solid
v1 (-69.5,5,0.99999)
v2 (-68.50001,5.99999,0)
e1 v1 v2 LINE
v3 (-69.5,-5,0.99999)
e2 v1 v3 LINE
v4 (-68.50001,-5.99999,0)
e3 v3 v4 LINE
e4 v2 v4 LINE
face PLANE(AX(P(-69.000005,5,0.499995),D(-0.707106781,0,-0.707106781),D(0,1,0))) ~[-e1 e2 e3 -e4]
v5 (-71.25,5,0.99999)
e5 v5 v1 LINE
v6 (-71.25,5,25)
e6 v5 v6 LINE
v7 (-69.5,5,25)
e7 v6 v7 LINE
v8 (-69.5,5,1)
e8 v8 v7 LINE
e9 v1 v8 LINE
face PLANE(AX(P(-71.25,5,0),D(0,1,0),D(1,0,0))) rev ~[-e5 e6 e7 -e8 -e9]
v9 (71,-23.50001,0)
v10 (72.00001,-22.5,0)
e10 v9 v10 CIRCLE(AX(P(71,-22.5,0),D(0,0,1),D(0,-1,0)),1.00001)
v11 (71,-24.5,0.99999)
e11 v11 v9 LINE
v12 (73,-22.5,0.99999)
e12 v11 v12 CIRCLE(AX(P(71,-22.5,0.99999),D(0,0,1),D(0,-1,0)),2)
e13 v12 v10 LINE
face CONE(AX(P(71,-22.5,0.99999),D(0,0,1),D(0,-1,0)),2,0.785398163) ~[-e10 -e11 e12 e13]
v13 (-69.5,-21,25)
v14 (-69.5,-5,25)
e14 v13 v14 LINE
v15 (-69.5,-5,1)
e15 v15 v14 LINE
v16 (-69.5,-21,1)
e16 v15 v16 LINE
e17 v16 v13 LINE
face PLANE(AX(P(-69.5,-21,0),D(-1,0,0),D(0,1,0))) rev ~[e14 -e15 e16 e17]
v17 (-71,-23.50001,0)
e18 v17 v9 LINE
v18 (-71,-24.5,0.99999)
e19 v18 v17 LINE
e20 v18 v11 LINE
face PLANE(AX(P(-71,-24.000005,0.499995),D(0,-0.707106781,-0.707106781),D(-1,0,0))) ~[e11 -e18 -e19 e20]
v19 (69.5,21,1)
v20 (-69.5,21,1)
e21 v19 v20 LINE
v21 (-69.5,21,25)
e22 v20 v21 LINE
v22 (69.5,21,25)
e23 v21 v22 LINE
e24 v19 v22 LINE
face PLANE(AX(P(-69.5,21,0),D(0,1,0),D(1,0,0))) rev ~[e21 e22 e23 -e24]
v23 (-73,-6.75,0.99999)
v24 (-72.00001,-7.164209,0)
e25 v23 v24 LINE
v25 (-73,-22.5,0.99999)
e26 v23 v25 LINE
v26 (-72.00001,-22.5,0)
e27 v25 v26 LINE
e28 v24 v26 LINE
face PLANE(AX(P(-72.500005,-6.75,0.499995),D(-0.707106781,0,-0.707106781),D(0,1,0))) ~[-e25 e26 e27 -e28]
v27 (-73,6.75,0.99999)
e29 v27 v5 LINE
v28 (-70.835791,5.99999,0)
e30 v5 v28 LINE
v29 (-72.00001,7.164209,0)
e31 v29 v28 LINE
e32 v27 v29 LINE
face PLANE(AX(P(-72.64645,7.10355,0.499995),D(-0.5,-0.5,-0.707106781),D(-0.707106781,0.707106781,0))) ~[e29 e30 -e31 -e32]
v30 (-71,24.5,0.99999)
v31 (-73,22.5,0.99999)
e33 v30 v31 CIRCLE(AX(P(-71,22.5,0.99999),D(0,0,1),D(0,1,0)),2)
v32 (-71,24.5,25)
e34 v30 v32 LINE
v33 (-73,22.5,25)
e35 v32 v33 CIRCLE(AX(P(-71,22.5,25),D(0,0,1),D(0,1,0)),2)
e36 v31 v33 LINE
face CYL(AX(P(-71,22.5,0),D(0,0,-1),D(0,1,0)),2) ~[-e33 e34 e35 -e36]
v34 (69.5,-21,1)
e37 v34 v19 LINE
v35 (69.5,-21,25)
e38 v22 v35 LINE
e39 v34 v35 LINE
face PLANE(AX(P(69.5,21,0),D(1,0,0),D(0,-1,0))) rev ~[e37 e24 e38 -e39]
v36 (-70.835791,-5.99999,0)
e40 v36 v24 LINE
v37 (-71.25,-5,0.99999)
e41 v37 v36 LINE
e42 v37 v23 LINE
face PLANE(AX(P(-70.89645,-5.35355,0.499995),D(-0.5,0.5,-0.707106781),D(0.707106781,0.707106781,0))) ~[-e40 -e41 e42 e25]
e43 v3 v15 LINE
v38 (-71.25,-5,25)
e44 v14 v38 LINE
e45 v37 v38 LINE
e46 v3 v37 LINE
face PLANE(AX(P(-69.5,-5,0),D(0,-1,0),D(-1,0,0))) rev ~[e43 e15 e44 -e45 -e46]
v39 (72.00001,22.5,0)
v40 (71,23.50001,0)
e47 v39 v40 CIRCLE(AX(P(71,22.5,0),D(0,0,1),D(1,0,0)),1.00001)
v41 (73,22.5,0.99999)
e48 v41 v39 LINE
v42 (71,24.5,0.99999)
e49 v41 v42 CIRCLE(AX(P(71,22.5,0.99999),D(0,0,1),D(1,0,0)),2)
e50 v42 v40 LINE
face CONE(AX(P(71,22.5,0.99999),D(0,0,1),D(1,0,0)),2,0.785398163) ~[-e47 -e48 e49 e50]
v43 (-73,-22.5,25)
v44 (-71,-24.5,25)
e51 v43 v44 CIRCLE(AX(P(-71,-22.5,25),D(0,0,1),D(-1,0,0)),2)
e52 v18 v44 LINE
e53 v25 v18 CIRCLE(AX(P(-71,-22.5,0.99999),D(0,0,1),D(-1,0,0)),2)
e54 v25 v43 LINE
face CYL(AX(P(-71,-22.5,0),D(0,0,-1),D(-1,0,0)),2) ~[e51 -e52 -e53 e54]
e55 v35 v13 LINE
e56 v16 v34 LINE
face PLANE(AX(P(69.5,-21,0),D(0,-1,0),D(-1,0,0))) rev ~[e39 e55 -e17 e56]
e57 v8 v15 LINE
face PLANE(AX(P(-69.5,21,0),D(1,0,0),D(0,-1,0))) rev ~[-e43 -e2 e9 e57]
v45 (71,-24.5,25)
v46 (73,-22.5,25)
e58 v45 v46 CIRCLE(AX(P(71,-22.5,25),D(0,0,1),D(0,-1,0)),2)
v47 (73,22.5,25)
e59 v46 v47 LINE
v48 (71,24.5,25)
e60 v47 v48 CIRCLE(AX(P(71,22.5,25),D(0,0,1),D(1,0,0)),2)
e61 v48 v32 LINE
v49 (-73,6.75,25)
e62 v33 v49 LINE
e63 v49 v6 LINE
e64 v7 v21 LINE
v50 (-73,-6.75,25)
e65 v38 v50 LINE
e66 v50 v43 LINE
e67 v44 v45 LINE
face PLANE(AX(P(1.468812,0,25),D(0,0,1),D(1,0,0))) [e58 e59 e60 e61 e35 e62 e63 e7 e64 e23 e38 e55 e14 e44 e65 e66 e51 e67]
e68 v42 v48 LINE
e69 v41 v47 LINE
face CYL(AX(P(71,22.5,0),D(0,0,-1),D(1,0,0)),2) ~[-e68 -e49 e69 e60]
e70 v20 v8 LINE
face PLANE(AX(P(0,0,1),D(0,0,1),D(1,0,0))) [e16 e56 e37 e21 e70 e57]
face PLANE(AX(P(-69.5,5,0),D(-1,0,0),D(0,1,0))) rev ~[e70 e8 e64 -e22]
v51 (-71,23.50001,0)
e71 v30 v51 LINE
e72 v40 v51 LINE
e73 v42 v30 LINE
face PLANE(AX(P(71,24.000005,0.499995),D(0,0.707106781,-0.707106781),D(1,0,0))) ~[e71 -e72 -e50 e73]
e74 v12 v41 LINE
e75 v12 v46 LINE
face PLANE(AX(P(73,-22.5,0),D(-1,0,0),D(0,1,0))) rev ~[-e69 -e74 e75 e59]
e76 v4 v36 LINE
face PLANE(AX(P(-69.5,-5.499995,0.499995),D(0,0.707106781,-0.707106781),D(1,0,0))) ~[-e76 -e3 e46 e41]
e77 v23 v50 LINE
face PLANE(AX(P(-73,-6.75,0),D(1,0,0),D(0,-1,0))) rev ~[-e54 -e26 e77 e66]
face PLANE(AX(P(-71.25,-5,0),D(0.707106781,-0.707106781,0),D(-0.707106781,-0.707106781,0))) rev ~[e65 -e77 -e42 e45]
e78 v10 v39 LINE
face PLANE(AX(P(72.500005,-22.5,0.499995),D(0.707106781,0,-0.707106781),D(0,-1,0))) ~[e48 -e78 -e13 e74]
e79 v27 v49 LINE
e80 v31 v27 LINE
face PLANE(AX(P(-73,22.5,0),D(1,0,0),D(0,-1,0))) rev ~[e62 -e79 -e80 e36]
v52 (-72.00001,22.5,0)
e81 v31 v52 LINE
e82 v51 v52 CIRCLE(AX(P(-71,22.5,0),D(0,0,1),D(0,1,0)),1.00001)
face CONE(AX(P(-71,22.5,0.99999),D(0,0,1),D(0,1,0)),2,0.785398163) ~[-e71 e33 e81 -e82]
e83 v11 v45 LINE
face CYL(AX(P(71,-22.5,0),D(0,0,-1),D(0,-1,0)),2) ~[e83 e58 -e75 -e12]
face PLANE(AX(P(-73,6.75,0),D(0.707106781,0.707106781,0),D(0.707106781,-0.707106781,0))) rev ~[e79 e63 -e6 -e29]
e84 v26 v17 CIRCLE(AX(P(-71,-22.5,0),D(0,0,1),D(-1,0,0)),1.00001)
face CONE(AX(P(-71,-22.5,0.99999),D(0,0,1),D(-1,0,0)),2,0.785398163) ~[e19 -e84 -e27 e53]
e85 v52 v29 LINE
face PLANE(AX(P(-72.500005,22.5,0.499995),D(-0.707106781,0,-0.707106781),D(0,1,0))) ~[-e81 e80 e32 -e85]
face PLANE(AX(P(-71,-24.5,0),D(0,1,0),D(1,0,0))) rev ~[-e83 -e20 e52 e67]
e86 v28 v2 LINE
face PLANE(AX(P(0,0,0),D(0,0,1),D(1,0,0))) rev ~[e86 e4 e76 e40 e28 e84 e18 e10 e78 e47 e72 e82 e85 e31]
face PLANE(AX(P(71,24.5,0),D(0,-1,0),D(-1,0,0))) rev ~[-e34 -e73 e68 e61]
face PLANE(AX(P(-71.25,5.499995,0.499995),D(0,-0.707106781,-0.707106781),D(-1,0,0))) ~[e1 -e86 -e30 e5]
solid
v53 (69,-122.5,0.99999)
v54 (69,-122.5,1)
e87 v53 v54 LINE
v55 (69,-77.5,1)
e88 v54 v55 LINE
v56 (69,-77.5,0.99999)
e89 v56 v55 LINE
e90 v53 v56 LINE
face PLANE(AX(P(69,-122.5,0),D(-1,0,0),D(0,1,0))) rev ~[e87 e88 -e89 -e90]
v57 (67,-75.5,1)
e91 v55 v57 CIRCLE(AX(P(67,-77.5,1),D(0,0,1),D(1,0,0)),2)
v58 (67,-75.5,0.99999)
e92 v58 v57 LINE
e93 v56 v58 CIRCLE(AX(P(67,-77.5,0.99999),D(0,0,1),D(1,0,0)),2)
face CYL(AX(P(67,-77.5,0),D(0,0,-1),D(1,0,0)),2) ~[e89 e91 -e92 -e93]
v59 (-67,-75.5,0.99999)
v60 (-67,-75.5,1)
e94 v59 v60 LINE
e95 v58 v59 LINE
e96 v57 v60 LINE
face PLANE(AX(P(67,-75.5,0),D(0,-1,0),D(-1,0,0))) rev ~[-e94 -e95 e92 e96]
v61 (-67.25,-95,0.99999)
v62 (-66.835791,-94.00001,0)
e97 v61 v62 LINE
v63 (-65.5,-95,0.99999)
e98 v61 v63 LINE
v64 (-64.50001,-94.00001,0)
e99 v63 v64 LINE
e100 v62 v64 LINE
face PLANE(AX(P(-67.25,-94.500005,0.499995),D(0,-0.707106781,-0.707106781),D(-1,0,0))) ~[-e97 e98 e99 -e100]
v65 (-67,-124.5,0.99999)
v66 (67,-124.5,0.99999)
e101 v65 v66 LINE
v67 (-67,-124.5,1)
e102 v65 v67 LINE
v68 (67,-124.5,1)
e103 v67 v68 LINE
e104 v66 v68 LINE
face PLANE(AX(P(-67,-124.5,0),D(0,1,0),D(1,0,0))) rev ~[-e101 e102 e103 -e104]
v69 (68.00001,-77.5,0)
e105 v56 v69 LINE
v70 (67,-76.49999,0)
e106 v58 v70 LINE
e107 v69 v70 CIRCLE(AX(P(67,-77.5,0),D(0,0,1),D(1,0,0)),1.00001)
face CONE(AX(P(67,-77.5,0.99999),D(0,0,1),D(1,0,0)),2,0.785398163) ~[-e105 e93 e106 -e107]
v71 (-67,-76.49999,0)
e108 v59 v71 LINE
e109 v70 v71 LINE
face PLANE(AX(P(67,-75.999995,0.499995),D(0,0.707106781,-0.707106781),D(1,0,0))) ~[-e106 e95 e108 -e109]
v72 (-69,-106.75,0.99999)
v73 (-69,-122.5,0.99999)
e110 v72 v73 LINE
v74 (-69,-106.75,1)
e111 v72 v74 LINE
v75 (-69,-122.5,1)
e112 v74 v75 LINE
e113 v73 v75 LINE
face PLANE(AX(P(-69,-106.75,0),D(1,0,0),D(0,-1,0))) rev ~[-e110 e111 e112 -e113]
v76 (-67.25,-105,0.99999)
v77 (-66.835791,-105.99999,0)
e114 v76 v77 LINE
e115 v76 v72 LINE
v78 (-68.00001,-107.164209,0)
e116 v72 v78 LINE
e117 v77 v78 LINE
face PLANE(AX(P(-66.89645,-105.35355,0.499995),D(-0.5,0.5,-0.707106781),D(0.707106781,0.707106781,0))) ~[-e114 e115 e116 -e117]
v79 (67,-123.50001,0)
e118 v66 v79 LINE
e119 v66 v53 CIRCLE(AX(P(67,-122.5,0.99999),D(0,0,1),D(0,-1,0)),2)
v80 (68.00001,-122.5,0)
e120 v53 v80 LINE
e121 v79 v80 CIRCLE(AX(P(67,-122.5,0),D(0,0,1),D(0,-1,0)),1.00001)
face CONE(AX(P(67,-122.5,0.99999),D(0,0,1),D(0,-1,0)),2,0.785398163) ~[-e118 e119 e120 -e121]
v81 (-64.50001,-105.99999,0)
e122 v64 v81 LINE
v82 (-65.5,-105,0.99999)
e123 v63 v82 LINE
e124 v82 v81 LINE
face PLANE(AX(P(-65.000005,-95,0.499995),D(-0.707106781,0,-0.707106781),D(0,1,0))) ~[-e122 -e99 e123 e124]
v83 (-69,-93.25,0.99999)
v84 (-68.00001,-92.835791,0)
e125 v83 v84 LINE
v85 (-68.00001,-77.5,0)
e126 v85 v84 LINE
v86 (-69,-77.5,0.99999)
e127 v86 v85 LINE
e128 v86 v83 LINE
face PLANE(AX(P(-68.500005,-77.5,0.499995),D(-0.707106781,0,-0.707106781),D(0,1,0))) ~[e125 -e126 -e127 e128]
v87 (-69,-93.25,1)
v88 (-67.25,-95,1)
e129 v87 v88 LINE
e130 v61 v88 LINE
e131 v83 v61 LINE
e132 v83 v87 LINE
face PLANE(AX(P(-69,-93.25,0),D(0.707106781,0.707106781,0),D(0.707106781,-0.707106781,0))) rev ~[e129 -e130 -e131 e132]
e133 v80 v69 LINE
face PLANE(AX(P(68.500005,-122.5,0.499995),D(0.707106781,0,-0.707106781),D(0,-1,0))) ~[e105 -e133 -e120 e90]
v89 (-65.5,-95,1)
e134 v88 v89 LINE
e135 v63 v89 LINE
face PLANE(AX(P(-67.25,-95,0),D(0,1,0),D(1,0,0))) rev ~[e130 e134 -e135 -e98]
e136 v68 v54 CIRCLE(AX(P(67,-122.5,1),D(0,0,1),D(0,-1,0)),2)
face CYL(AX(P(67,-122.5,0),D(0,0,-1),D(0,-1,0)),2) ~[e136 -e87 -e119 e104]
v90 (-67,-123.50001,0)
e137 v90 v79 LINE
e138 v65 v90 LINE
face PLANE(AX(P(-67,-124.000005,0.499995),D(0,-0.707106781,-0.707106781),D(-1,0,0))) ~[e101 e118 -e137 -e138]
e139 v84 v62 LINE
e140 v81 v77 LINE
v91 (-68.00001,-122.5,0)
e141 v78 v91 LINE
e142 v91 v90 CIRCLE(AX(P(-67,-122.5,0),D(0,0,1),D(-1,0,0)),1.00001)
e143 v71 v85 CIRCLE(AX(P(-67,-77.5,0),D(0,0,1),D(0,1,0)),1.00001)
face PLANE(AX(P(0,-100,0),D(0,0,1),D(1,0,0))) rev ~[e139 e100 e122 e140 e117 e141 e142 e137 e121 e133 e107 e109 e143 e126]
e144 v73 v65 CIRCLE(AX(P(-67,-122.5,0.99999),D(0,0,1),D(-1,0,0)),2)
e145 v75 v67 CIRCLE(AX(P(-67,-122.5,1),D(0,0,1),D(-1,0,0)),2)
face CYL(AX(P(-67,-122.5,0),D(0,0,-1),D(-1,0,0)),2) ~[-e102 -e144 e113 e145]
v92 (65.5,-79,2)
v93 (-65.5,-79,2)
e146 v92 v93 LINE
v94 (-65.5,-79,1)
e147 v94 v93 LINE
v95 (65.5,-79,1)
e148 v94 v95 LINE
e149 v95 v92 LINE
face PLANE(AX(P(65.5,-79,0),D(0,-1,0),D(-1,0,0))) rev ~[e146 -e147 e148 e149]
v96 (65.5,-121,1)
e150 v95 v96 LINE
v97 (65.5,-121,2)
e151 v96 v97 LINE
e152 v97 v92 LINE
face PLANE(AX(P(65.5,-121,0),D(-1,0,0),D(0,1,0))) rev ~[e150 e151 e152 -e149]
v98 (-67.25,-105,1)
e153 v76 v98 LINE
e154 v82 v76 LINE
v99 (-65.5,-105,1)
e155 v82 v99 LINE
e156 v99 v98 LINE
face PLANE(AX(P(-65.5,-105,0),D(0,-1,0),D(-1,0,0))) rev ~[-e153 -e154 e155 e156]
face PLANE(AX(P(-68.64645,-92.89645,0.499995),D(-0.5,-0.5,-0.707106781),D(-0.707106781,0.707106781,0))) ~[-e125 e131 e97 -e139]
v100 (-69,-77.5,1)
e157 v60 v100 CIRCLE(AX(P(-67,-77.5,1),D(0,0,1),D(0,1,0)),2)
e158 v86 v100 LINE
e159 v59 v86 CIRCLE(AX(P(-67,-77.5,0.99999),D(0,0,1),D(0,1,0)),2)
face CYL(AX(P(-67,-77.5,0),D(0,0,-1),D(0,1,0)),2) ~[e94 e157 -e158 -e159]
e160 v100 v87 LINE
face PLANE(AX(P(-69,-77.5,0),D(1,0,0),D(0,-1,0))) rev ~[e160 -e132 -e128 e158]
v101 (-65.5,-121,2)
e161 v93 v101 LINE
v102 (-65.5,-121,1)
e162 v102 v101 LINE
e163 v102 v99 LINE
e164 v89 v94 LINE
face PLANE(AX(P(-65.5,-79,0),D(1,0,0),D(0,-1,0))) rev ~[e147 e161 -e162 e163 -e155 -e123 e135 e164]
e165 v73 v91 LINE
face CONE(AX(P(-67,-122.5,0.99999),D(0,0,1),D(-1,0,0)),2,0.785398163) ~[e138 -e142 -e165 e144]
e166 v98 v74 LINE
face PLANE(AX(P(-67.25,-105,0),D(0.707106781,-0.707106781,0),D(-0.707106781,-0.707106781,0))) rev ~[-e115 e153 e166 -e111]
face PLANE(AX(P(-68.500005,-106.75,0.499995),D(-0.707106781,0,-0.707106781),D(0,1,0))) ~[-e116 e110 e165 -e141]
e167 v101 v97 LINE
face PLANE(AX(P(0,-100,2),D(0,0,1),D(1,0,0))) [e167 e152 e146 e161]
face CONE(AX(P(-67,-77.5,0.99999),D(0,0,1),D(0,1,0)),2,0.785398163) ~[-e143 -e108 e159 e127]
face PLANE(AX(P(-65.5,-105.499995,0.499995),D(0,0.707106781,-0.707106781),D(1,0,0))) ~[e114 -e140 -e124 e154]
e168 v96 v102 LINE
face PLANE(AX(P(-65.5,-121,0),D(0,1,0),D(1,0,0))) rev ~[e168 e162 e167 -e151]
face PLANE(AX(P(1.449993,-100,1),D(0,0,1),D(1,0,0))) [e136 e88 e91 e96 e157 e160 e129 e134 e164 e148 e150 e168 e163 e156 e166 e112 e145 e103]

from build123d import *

# Parameters (mm, degrees)
F1_DEPTH  = 1
F2_DEPTH  = 25
F3_DEPTH  = 1
F4_DEPTH  = 2
F5_SIZE   = 0.99999
F5_2_SIZE = 0.99999


# Not quite as in the source:
# - a fillet or chamfer is up to 0.001 mm smaller than in the source, because OpenCascade refuses the exact size


with BuildPart() as f1:
    # F0 (on Top) → F1 (new body)
    with BuildSketch(Plane.XY):
        Polygon((-69.5, -5), (-69.5, -21), (69.5, -21), (69.5, 21), (-69.5, 21), (-69.5, 5), align=None)
    extrude(amount=F1_DEPTH)

    # F0 (on Top) → F2 (join)
    with BuildSketch(Plane.XY):
        with BuildLine():
            Line((69.5, -21), (-69.5, -21))
            Line((-69.5, -21), (-69.5, -5))
            Line((-69.5, -5), (-71.25, -5))
            Line((-71.25, -5), (-73, -6.75))
            Line((-73, -6.75), (-73, -22.5))
            ThreePointArc((-73, -22.5), (-72.4142135624, -23.9142135624), (-71, -24.5))
            Line((-71, -24.5), (71, -24.5))
            ThreePointArc((71, -24.5), (72.4142135624, -23.9142135624), (73, -22.5))
            Line((73, -22.5), (73, 22.5))
            ThreePointArc((73, 22.5), (72.4142135624, 23.9142135624), (71, 24.5))
            Line((71, 24.5), (-71, 24.5))
            ThreePointArc((-71, 24.5), (-72.4142135624, 23.9142135624), (-73, 22.5))
            Line((-73, 22.5), (-73, 6.75))
            Line((-73, 6.75), (-71.25, 5))
            Line((-71.25, 5), (-69.5, 5))
            Line((-69.5, 5), (-69.5, 21))
            Line((-69.5, 21), (69.5, 21))
            Line((69.5, 21), (69.5, -21))
        make_face()
    extrude(amount=F2_DEPTH)

    # F5 (size 1 in the source; OpenCascade refuses exactly that, so slightly less here)
    f5_edges = [f1.edges().sort_by_distance(p)[0] for p in [
        (-69.5, 0, 0),
        (-70.375, -5, 0),
        (-72.125, -5.875, 0),
        (-73, -14.625, 0),
        (-72.414214, -23.914214, 0),
        (0, -24.5, 0),
        (72.414214, -23.914214, 0),
        (73, 0, 0),
        (72.414214, 23.914214, 0),
        (0, 24.5, 0),
        (-72.414214, 23.914214, 0),
        (-73, 14.625, 0),
        (-72.125, 5.875, 0),
        (-70.375, 5, 0),
    ]]
    chamfer(f5_edges, length=F5_SIZE)


with BuildPart() as f3:
    # F0 (on Top) → F3 (new body)
    with BuildSketch(Plane.XY):
        with BuildLine():
            Line((65.5, -121), (-65.5, -121))
            Line((-65.5, -121), (-65.5, -105))
            Line((-65.5, -105), (-67.25, -105))
            Line((-67.25, -105), (-69, -106.75))
            Line((-69, -106.75), (-69, -122.5))
            ThreePointArc((-69, -122.5), (-68.4142135624, -123.9142135624), (-67, -124.5))
            Line((-67, -124.5), (67, -124.5))
            ThreePointArc((67, -124.5), (68.4142135624, -123.9142135624), (69, -122.5))
            Line((69, -122.5), (69, -77.5))
            ThreePointArc((69, -77.5), (68.4142135624, -76.0857864376), (67, -75.5))
            Line((67, -75.5), (-67, -75.5))
            ThreePointArc((-67, -75.5), (-68.4142135624, -76.0857864376), (-69, -77.5))
            Line((-69, -77.5), (-69, -93.25))
            Line((-69, -93.25), (-67.25, -95))
            Line((-67.25, -95), (-65.5, -95))
            Line((-65.5, -95), (-65.5, -79))
            Line((-65.5, -79), (65.5, -79))
            Line((65.5, -79), (65.5, -121))
        make_face()
    extrude(amount=F3_DEPTH)

    # F0 (on Top) → F4 (join)
    with BuildSketch(Plane.XY):
        Polygon((-65.5, -105), (-65.5, -121), (65.5, -121), (65.5, -79), (-65.5, -79), (-65.5, -95), align=None)
    extrude(amount=F4_DEPTH)

    # F5#2 (size 1 in the source; OpenCascade refuses exactly that, so slightly less here)
    f5_2_edges = [f3.edges().sort_by_distance(p)[0] for p in [
        (0, -124.5, 0),
        (-68.125, -105.875, 0),
        (-68.125, -94.125, 0),
        (-66.375, -95, 0),
        (-66.375, -105, 0),
        (-65.5, -100, 0),
    ]]
    chamfer(f5_2_edges, length=F5_2_SIZE)


solid = Compound([f1.part, f3.part])
